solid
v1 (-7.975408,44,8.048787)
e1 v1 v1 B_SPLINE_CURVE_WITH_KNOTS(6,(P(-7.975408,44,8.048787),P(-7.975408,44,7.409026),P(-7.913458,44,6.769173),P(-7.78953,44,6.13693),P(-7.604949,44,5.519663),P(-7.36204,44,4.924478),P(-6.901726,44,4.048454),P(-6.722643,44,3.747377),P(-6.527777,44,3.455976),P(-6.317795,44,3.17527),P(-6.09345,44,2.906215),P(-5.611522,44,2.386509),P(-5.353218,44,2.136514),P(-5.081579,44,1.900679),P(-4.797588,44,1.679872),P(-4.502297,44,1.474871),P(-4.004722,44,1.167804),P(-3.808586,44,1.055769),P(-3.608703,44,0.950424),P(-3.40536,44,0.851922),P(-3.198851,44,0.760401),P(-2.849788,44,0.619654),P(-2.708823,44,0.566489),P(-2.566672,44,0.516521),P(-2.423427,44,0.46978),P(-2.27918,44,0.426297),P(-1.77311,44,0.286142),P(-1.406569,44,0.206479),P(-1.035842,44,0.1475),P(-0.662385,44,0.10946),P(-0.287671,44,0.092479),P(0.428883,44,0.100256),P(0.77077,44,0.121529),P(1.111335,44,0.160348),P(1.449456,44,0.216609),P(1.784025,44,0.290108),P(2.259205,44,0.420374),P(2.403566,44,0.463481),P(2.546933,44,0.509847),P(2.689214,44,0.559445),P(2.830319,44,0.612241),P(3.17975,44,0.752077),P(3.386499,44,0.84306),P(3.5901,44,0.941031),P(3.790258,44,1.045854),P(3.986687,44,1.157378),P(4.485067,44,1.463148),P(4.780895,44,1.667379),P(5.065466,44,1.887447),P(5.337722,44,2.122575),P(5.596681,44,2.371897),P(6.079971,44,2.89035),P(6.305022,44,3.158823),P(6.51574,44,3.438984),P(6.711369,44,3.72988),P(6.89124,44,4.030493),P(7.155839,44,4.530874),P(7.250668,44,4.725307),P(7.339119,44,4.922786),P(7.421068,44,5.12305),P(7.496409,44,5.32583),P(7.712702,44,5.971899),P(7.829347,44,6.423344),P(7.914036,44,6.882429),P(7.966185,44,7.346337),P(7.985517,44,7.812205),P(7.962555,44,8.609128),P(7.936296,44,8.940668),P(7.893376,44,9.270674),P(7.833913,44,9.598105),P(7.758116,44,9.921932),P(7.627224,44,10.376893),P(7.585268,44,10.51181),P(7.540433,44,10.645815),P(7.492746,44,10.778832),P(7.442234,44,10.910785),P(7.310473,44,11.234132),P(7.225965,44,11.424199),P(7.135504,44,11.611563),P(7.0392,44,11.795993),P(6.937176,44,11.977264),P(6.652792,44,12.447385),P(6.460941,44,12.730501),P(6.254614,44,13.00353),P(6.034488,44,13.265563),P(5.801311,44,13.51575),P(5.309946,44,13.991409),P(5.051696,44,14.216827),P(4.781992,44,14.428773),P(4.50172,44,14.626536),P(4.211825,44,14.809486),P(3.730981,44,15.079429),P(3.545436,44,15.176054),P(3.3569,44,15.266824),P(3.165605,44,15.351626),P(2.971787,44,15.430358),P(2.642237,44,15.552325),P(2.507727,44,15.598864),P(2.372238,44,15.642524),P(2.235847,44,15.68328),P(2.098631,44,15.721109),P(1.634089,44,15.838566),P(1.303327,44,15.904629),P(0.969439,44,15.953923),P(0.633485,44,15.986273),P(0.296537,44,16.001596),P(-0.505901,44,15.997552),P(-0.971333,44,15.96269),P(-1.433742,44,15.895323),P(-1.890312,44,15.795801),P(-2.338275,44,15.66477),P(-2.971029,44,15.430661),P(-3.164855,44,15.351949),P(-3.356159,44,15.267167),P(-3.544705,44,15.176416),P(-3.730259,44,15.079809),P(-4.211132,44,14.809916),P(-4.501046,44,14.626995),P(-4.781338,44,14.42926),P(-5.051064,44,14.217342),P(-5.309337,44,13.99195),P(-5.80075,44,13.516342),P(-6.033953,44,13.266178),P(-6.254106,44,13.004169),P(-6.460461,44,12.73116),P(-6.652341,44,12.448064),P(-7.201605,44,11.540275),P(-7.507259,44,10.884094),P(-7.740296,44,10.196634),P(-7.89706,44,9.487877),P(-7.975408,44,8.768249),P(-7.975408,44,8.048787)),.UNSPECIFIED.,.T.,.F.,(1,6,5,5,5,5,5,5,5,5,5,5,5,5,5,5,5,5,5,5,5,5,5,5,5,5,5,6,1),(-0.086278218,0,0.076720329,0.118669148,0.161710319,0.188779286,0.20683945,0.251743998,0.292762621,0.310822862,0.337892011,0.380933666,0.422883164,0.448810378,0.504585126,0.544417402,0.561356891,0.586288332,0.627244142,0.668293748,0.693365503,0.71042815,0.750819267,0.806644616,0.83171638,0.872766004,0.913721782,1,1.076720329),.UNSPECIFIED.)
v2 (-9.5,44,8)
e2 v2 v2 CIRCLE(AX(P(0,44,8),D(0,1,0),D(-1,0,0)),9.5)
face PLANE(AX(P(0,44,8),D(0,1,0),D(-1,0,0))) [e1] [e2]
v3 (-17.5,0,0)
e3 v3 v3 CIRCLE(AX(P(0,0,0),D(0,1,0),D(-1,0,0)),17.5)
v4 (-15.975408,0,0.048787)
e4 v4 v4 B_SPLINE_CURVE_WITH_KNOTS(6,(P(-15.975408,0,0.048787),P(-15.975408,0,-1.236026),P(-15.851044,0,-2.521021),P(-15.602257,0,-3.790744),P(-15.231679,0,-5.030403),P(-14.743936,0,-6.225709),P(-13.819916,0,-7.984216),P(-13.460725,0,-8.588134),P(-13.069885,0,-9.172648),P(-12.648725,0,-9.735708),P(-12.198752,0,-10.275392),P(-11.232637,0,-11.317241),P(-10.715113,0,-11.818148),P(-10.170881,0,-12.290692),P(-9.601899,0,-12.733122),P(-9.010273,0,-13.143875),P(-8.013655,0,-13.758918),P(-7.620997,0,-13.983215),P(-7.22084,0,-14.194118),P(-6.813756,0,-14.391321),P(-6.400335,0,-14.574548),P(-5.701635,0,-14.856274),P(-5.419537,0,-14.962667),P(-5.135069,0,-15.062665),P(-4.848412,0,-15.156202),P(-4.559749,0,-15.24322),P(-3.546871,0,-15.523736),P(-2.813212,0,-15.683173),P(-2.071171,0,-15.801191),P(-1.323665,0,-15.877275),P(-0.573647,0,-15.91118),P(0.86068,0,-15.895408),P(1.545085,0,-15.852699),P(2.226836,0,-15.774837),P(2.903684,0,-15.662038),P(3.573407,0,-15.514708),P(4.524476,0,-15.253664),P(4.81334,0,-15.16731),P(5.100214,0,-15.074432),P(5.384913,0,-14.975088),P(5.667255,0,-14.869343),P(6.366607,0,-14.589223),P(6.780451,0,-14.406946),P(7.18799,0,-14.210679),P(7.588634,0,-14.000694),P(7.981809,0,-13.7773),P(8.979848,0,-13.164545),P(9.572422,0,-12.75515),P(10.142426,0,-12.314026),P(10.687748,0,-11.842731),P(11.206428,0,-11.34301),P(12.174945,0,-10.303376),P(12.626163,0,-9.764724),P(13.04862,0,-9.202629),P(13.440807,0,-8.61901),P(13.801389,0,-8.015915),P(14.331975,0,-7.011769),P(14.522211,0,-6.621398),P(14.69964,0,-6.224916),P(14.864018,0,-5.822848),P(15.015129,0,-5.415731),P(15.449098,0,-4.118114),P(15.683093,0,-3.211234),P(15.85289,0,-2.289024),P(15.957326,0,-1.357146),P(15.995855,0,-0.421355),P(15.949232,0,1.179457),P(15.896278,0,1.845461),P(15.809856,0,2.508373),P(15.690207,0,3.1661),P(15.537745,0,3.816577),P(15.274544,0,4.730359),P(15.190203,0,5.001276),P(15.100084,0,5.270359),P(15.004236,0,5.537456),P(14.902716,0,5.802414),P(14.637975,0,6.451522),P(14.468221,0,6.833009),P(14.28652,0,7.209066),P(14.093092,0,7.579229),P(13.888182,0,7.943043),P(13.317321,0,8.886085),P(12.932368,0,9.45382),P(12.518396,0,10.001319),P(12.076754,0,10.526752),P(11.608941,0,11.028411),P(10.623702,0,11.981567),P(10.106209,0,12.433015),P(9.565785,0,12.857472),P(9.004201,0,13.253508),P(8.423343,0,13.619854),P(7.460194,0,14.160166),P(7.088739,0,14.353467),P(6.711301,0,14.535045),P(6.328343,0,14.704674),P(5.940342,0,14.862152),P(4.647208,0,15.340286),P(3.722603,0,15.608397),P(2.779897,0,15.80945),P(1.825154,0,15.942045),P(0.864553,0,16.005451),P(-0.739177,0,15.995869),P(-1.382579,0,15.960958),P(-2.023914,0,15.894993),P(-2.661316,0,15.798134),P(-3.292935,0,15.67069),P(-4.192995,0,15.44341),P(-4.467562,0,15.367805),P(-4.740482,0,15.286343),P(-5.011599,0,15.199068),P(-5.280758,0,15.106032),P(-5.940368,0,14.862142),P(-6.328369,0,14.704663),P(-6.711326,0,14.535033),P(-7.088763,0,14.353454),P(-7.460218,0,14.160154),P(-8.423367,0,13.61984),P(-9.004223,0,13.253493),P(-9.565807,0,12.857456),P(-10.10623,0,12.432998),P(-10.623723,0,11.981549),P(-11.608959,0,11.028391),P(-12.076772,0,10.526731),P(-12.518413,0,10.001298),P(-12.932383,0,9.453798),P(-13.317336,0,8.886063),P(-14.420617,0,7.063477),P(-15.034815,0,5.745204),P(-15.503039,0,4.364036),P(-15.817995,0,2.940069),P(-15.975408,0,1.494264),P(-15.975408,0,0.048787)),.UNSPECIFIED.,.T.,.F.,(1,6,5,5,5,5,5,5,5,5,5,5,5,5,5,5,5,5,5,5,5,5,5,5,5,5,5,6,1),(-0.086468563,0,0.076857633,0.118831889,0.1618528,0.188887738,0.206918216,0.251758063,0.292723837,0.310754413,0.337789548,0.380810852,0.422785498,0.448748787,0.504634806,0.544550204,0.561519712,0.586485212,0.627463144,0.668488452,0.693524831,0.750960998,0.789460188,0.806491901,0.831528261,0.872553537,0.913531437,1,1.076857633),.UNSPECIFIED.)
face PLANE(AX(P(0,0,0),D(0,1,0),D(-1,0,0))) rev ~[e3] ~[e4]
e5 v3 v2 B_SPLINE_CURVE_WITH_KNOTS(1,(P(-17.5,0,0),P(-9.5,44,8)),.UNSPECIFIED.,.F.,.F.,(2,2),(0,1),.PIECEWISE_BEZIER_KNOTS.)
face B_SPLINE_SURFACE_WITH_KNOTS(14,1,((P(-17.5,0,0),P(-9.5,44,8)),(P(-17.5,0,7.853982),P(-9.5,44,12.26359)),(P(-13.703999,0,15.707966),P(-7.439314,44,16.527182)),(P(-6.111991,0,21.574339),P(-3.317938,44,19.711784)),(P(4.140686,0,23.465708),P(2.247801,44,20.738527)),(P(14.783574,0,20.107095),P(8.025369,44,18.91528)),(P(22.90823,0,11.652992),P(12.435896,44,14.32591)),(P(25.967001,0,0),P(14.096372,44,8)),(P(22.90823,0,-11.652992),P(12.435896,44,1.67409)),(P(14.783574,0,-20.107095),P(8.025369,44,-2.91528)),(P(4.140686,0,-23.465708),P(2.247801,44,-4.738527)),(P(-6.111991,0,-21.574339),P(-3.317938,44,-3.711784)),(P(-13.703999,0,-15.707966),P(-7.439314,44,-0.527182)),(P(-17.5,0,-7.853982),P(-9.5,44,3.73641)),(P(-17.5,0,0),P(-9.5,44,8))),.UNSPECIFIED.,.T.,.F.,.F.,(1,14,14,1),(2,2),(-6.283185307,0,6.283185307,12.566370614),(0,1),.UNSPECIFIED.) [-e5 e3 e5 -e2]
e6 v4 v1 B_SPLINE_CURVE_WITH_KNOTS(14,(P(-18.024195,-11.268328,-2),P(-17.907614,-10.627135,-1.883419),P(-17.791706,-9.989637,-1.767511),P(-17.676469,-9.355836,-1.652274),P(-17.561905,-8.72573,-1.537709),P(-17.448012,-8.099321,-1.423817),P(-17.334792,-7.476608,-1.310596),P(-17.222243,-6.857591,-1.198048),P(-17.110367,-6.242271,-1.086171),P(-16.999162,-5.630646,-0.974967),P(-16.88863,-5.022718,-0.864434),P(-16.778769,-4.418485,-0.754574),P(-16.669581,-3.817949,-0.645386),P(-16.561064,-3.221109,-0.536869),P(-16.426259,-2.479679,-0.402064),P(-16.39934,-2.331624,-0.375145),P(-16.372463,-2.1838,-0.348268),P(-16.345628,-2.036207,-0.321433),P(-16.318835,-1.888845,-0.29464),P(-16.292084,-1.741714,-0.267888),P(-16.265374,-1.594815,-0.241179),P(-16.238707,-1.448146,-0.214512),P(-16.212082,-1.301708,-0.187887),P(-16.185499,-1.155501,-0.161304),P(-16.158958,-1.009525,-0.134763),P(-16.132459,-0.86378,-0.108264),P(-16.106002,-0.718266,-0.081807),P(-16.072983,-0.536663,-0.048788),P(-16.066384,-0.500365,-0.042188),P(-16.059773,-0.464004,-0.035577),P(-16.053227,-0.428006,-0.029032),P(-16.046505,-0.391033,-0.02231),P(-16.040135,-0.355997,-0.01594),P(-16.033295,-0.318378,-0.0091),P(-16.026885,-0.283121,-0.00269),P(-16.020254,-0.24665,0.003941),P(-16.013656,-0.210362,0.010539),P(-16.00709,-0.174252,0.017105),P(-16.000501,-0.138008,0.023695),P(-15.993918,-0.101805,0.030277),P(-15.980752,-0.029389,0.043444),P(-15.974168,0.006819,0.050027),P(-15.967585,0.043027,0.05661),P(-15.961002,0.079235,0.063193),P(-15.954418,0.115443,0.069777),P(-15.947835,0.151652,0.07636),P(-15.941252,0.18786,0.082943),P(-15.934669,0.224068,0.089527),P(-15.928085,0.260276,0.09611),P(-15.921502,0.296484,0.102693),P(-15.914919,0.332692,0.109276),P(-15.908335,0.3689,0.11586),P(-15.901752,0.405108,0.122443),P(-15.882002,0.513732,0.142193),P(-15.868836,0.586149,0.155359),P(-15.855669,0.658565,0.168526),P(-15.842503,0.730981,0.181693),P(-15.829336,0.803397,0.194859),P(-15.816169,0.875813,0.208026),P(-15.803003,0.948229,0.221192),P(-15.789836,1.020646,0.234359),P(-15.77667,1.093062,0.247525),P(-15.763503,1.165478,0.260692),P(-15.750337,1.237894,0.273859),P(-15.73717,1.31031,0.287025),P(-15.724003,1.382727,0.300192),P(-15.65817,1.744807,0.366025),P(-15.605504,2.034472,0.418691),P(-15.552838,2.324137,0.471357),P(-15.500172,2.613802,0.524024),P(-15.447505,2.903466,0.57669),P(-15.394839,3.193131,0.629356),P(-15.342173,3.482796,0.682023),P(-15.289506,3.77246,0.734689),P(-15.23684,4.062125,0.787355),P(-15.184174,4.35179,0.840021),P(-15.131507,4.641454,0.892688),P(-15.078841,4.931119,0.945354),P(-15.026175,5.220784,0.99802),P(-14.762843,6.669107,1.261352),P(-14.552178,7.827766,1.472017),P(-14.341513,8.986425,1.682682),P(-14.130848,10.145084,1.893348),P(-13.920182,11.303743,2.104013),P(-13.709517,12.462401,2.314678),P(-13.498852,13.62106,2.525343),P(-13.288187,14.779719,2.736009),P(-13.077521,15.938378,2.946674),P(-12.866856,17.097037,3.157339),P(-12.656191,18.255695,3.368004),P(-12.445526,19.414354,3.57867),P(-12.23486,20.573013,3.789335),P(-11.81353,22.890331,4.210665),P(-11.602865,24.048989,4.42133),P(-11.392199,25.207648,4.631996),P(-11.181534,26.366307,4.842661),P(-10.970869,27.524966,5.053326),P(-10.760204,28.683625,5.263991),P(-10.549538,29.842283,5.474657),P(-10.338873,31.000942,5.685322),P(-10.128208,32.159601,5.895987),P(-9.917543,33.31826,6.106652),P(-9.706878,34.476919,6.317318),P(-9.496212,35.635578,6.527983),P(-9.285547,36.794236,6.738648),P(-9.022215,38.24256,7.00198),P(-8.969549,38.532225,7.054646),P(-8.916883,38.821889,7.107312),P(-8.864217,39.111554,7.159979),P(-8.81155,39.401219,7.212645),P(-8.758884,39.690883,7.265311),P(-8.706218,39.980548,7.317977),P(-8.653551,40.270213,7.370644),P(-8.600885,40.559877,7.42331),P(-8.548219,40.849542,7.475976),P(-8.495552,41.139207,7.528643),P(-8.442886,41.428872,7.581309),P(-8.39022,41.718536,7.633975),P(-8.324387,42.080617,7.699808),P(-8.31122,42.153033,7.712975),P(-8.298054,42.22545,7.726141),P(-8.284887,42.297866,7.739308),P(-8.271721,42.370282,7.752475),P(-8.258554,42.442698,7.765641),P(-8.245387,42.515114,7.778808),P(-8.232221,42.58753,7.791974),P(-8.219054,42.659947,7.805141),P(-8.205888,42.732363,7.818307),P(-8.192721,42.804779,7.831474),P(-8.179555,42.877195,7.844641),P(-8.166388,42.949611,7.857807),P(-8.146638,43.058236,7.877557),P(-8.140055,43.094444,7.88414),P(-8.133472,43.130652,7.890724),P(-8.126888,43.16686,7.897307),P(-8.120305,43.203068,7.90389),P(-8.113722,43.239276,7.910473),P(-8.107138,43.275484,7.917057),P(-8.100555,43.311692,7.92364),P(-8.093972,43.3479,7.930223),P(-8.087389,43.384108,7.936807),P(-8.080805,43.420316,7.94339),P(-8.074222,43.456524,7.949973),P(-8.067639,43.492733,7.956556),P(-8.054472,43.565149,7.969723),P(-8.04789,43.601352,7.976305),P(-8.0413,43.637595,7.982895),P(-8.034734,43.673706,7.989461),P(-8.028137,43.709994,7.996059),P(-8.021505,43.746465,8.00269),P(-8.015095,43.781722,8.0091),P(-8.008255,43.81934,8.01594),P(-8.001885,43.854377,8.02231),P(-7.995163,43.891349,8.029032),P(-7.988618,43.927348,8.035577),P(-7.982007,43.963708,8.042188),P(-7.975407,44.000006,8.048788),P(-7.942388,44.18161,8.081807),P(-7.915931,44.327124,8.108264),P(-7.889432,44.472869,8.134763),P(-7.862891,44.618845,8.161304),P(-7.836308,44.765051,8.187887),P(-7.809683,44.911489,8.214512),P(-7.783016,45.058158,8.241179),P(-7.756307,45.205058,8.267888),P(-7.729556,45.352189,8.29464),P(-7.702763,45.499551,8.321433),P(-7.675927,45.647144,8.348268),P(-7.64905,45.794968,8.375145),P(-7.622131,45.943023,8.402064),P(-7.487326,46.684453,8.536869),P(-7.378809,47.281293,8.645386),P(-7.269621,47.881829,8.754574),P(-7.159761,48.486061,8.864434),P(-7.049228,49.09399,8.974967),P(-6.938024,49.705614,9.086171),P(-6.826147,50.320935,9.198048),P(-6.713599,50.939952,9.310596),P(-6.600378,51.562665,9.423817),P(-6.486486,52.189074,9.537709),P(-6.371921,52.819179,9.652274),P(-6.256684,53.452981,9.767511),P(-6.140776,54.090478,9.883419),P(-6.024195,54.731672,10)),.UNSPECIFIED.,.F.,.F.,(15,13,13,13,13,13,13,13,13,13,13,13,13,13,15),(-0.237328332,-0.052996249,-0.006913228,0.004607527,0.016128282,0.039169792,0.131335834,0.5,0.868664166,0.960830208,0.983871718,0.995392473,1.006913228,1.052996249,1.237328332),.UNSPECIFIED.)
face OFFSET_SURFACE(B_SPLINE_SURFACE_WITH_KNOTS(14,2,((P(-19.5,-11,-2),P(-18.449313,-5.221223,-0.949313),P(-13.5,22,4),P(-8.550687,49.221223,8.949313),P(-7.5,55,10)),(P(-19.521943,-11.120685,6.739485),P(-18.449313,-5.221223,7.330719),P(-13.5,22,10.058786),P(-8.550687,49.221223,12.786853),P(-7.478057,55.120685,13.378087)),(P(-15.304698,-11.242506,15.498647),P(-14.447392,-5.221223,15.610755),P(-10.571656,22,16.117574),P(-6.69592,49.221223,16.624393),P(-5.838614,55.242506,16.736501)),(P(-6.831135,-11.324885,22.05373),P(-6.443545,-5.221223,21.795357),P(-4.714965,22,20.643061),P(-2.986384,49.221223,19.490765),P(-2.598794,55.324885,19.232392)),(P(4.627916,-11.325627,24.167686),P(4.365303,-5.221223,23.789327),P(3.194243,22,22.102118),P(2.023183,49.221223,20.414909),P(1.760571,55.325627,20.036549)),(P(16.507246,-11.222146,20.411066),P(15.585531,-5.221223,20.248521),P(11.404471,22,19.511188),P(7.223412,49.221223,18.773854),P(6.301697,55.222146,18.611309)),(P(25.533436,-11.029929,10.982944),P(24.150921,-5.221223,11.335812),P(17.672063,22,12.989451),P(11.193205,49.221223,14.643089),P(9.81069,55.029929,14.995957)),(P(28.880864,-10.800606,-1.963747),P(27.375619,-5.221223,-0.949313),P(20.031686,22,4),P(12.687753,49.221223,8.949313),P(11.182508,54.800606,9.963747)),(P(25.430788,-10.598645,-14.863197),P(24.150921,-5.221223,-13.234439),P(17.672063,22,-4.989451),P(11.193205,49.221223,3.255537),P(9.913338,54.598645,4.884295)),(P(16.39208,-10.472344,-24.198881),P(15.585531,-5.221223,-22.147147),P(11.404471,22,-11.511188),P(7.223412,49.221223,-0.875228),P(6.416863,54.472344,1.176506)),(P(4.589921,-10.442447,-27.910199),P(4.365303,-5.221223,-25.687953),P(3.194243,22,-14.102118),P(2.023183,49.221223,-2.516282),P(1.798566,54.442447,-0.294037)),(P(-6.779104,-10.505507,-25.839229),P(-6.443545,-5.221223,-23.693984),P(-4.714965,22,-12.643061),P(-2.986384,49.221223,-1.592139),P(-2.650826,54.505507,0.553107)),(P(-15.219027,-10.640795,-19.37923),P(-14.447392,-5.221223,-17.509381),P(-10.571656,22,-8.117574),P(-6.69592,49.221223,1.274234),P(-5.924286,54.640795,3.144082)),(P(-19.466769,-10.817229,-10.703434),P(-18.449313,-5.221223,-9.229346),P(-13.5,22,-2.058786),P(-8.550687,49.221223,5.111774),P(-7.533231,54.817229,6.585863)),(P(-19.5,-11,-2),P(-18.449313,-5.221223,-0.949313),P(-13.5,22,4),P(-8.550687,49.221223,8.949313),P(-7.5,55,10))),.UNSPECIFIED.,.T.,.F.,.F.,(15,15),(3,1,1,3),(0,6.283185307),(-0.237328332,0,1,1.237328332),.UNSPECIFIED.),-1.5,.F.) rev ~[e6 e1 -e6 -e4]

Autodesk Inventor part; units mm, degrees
ref_plane "YZ Plane" through (0, 0, 0) normal (1, 0, 0) x (0, 1, 0)
ref_plane "XY Plane" through (0, 0, 0) normal (0, 0, 1) x (1, 0, 0)
sketch "Szkic6" plane through (0, 0, 0) normal (0, 1, 0) x (-1, 0, 0)
  circle A0 centre (0, 0) radius 17.5
  dimension "d33" = 35
ref_plane "Płaszczyzna konstrukcyjna1" through (0, 44, 0) normal (0, 1, 0) x (-1, 0, 0)
sketch "Szkic7" plane through (0, 44, 0) normal (0, 1, 0) x (-1, 0, 0)
  circle A0 centre (0, 8) radius 9.5
  line L0 (0, -20.3) -> (0, 20.3) construction
  circle A1 centre (0, 0) radius 17.5 construction
  dimension "d35" = 19
loft "Wyciągnięcie złożone1" add profiles "Szkic6", "Szkic7"
shell "Skorupa1" thickness 1.5 removed faces 2 at (-2.0627, 44, 6.3457) at (-4.3663, 0, -1.0762)
equation "\"d33\" = OD1"
equation "\"d35\" = OD2"
equation "\"d52\" = THK"
equation "\"SzerokośćGięciaPodcięcia\" = Grubość"
equation "\"RozmiarPodcięciaNarożnika\" = 4 * Grubość"
equation "\"PromieńPrzejścia\" = PromieńGięcia"
equation "\"Rozmiar_promienia_Jacobiego\" = PromieńGięcia"
equation "\"Wielk_odstępu\" = Grubość"
equation "\"d2\" = PromieńGięcia"
equation "\"d23\" = PromieńGięcia"
equation "\"OD1\" = 35"
equation "\"OD2\" = 19"
equation "\"L\" = 44"
equation "\"THK\" = 1.5"
equation "\"d34\" = L"
equation "\"Grubość\" = 1.5"
equation "\"PromieńGięcia\" = 3"
properties part number "Redukcja asymetryczna Ø35x19x1,5 L=44" material "304"
